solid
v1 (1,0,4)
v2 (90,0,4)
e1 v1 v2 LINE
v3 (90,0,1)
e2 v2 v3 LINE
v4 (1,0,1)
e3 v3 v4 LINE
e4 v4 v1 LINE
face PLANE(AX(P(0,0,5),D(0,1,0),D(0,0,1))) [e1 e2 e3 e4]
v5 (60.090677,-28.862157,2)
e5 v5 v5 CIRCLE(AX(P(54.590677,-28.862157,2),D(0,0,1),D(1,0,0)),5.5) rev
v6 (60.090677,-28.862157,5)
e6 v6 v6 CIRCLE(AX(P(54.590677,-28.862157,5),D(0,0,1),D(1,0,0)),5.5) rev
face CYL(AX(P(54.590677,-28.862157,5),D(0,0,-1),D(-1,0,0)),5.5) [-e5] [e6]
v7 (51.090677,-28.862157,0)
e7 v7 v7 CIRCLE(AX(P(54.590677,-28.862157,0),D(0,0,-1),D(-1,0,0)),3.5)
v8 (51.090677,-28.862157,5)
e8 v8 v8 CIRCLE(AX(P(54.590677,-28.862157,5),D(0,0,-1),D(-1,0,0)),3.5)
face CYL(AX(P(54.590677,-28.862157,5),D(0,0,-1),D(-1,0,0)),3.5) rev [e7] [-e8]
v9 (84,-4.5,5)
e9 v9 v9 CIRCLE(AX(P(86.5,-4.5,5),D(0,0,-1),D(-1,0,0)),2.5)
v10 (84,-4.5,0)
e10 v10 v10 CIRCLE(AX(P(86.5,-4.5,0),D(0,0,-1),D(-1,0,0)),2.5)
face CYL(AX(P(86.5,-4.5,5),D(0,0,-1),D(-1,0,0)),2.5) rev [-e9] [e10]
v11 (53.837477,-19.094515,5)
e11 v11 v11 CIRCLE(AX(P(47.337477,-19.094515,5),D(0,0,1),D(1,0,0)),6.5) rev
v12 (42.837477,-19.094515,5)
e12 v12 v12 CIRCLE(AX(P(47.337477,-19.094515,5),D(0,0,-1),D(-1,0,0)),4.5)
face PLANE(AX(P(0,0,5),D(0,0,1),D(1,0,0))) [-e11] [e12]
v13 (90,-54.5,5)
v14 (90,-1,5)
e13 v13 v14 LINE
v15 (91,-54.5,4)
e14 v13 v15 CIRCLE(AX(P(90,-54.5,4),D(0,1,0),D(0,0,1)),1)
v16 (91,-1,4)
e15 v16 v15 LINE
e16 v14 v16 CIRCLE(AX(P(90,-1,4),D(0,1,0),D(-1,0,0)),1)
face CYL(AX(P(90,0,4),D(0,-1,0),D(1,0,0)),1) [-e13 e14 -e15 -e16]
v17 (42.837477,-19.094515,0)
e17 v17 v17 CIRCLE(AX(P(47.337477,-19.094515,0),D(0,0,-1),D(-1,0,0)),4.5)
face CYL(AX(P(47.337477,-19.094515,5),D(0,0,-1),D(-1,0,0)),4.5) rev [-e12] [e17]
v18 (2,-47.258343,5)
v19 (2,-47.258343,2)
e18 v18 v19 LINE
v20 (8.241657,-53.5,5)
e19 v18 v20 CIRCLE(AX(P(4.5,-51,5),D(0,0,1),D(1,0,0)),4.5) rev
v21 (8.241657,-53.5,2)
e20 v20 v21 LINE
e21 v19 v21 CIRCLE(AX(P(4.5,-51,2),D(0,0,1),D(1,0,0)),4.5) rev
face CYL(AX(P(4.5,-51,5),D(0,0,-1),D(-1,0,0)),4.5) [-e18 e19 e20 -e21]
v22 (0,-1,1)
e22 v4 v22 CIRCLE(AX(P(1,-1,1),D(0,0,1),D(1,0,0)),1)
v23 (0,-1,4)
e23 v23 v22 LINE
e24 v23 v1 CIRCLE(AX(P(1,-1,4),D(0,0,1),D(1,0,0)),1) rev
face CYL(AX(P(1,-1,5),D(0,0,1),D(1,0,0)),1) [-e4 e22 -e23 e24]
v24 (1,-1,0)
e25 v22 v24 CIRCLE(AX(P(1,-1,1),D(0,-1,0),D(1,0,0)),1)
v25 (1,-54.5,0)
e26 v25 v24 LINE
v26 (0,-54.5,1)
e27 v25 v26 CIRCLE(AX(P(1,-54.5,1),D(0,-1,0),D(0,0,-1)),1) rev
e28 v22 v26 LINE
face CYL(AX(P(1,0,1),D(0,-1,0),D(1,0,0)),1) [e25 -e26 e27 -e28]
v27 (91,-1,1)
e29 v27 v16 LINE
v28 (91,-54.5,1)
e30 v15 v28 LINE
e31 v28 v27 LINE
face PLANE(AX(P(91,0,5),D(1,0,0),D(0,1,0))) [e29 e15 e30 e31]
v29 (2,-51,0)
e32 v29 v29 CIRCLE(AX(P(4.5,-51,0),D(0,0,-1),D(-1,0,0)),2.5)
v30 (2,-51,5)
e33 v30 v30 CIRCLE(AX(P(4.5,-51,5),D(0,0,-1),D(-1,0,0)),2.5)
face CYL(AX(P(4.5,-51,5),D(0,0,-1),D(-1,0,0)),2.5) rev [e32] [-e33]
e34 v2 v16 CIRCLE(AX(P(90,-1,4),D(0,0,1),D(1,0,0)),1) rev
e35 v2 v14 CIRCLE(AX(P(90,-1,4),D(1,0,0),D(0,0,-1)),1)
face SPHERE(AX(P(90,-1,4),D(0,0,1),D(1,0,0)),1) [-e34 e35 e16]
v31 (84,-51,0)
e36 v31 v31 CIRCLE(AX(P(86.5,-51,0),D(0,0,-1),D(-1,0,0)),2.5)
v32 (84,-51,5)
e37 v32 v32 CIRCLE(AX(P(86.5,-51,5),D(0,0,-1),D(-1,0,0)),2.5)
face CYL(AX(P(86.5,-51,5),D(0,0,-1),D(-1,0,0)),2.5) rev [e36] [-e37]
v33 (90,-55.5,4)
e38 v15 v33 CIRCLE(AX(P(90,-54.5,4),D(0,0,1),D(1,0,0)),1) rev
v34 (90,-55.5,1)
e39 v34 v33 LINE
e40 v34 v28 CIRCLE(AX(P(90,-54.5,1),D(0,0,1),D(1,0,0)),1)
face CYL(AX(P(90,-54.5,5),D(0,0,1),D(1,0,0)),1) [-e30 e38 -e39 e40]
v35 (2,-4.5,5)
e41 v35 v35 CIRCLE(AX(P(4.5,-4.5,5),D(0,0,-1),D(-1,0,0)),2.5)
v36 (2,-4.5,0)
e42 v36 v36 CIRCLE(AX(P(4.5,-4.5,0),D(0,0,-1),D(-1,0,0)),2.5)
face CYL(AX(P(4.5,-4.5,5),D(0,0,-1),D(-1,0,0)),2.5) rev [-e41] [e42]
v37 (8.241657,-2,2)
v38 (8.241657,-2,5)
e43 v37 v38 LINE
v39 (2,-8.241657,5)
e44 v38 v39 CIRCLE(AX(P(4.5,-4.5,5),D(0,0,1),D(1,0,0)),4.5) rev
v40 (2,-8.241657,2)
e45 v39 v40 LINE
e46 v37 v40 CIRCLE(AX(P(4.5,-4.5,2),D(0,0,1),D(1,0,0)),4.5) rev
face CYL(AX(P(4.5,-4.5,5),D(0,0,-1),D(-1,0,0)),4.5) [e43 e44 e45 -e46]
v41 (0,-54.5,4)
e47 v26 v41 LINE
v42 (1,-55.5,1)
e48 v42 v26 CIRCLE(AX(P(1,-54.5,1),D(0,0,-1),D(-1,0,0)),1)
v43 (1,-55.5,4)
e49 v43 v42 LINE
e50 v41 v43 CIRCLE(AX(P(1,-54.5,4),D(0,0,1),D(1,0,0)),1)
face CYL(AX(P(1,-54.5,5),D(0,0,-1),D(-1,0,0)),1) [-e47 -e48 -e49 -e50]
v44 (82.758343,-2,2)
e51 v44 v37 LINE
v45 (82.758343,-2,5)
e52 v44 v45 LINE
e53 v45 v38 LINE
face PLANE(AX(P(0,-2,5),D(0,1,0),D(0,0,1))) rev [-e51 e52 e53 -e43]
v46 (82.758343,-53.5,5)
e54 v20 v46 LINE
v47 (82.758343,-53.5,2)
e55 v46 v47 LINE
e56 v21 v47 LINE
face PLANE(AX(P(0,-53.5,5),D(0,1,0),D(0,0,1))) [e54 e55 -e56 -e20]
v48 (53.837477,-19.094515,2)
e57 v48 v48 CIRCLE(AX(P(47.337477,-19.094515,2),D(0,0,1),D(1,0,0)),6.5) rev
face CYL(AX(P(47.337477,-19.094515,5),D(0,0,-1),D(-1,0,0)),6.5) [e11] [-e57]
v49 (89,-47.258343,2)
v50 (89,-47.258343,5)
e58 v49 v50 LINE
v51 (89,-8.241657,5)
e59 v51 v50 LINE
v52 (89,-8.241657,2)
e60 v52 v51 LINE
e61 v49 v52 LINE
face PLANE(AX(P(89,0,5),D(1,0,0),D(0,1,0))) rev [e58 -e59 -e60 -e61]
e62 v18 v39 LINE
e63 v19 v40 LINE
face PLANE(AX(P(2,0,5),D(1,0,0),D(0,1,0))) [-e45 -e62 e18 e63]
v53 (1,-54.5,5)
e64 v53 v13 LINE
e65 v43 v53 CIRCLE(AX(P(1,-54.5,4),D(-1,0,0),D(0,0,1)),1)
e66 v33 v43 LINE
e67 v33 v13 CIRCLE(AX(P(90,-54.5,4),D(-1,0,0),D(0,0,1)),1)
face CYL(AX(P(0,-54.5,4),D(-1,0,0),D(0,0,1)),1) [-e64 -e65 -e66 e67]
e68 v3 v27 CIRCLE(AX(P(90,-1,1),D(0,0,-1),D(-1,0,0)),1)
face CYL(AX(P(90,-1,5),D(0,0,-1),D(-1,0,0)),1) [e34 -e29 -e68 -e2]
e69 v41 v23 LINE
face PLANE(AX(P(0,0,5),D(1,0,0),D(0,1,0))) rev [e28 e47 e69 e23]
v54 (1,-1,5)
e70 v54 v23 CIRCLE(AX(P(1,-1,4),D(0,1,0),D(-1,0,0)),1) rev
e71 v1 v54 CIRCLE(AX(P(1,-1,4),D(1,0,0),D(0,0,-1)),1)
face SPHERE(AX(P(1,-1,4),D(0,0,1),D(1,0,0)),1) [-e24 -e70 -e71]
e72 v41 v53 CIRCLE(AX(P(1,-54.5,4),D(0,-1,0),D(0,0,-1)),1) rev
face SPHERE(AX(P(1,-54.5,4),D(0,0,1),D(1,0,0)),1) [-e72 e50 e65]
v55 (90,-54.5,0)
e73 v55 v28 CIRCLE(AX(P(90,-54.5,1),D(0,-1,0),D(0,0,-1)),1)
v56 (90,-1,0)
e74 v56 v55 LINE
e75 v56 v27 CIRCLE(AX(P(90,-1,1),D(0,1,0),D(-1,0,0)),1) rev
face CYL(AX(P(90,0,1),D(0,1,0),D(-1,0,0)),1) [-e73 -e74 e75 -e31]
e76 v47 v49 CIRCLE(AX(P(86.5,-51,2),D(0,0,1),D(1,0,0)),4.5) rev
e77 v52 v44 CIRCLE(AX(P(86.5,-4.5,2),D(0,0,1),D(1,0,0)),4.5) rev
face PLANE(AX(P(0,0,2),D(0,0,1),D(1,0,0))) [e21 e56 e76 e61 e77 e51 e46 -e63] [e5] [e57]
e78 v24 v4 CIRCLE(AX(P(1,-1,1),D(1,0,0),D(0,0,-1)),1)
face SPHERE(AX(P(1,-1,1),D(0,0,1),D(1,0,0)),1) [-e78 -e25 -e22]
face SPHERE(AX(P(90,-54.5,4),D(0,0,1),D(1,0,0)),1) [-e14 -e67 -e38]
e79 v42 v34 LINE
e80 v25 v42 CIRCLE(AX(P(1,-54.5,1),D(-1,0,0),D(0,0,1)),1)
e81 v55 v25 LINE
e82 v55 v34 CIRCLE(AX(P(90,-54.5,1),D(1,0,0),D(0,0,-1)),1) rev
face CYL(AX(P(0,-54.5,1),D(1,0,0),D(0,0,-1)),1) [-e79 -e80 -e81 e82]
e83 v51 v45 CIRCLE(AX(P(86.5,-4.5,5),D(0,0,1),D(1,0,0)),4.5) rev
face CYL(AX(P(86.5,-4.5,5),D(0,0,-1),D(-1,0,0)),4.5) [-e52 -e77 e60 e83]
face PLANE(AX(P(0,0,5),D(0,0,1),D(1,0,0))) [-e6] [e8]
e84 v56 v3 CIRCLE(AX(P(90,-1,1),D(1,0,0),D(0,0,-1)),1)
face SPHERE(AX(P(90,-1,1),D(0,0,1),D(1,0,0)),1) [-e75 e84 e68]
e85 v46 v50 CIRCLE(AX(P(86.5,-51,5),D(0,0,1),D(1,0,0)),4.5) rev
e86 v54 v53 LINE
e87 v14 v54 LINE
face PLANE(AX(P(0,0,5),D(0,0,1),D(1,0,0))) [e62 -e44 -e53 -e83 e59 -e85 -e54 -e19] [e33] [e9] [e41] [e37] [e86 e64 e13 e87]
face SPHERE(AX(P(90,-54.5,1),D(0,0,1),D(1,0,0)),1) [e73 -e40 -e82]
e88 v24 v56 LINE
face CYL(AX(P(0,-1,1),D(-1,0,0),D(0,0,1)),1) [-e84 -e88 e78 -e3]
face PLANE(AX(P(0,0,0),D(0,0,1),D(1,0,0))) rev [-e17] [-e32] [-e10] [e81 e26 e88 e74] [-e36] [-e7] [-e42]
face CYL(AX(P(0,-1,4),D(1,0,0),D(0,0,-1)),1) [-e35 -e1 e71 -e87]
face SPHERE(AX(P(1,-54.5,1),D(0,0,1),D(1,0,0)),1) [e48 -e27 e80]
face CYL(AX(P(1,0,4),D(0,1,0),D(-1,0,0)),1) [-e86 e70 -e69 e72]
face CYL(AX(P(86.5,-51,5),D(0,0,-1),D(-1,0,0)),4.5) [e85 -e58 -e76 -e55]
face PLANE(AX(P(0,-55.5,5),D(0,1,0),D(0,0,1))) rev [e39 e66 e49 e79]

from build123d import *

# Parameters (mm, degrees)
SKETCH1_W           = 91
SKETCH1_H           = 55.5
BOSS_EXTRUDE1_DEPTH = 5
FILLET1_R           = 1
FILLET2_R           = 1
SKETCH3_R           = 2.5
SKETCH3_R_2         = 4.5
SKETCH3_R_3         = 3.5
CUT_EXTRUDE6_DEPTH  = 5
SHELL3_START        = 2
SHELL3_OUTLINE_R    = 5.5
SHELL3_OUTLINE_R_2  = 6.5
SHELL3_DEPTH        = 3


# Read off the part's stored shape, not the designer's step: Shell3
with BuildPart() as part:
    # Sketch1 → Boss-Extrude1 (new body)
    with BuildSketch(Plane.XY):
        with Locations((45.5, -27.75)):
            Rectangle(SKETCH1_W, SKETCH1_H)
    extrude(amount=BOSS_EXTRUDE1_DEPTH)

    # Fillet1
    fillet1_edges = [part.edges().sort_by_distance(p)[0] for p in [
        (0, -27.75, 5),
        (45.5, -55.5, 0),
        (0, -27.75, 0),
        (45.5, -55.5, 5),
        (0, 0, 2.5),
        (91, -55.5, 2.5),
        (0, -55.5, 2.5),
    ]]
    fillet(fillet1_edges, radius=FILLET1_R)

    # Fillet2
    # the kernel refuses this fillet: 1 mm, written as the material it takes off along each edge
    with BuildSketch(Plane(origin=(90, -54.5, 4), x_dir=(0, 0, 1), z_dir=(1, 0, 0))) as fillet2_piece_1_section:
        Polygon((0, 0), (FILLET2_R, 0), (FILLET2_R, FILLET2_R), (0, FILLET2_R), align=None)
    fillet2_piece_1 = extrude(amount=FILLET2_R, mode=Mode.PRIVATE)
    fillet2_piece_1 = fillet2_piece_1 - Plane(origin=(90, -54.5, 4), x_dir=(0, 0.7071067811865475, -0.7071067811865475), z_dir=(1, 0, 0)) * Sphere(FILLET2_R, mode=Mode.PRIVATE)
    add(fillet2_piece_1, mode=Mode.SUBTRACT)
    with BuildSketch(Plane(origin=(90, -54.5, 1), x_dir=(1, 0, 0), z_dir=(0, 0, -1))) as fillet2_piece_2_section:
        Polygon((0, 0), (FILLET2_R, 0), (FILLET2_R, FILLET2_R), (0, FILLET2_R), align=None)
    fillet2_piece_2 = extrude(amount=FILLET2_R, mode=Mode.PRIVATE)
    fillet2_piece_2 = fillet2_piece_2 - Plane(origin=(90, -54.5, 1), x_dir=(-0.7071067811865476, 0.7071067811865475, 0), z_dir=(0, 0, -1)) * Sphere(FILLET2_R, mode=Mode.PRIVATE)
    add(fillet2_piece_2, mode=Mode.SUBTRACT)
    with BuildSketch(Plane(origin=(1, -1, 4), x_dir=(0, 0, 1), z_dir=(0, 1, 0))) as fillet2_piece_3_section:
        Polygon((0, 0), (FILLET2_R, 0), (FILLET2_R, -FILLET2_R), (0, -FILLET2_R), align=None)
    fillet2_piece_3 = extrude(amount=FILLET2_R, mode=Mode.PRIVATE)
    fillet2_piece_3 = fillet2_piece_3 - Plane(origin=(1, -1, 4), x_dir=(0.7071067811865475, 0, -0.7071067811865475), z_dir=(0, 1, 0)) * Sphere(FILLET2_R, mode=Mode.PRIVATE)
    add(fillet2_piece_3, mode=Mode.SUBTRACT)
    with BuildSketch(Plane(origin=(1, -1, 1), x_dir=(0, 0, -1), z_dir=(0, 1, 0))) as fillet2_piece_4_section:
        Polygon((0, 0), (FILLET2_R, 0), (FILLET2_R, FILLET2_R), (0, FILLET2_R), align=None)
    fillet2_piece_4 = extrude(amount=FILLET2_R, mode=Mode.PRIVATE)
    fillet2_piece_4 = fillet2_piece_4 - Plane(origin=(1, -1, 1), x_dir=(0.7071067811865475, 0, 0.7071067811865475), z_dir=(0, 1, 0)) * Sphere(FILLET2_R, mode=Mode.PRIVATE)
    add(fillet2_piece_4, mode=Mode.SUBTRACT)
    with BuildSketch(Plane(origin=(90, -1, 4), x_dir=(1, 0, 0), z_dir=(0, 1, 0))) as fillet2_piece_5_section:
        Polygon((0, 0), (FILLET2_R, 0), (FILLET2_R, -FILLET2_R), (0, -FILLET2_R), align=None)
    fillet2_piece_5 = extrude(amount=FILLET2_R, mode=Mode.PRIVATE)
    fillet2_piece_5 = fillet2_piece_5 - Plane(origin=(90, -1, 4), x_dir=(-0.7071067811865475, 0, -0.7071067811865475), z_dir=(0, 1, 0)) * Sphere(FILLET2_R, mode=Mode.PRIVATE)
    add(fillet2_piece_5, mode=Mode.SUBTRACT)
    with BuildSketch(Plane(origin=(90, -1, 1), x_dir=(0, 0, -1), z_dir=(0, 1, 0))) as fillet2_piece_6_section:
        Polygon((0, 0), (FILLET2_R, 0), (FILLET2_R, -FILLET2_R), (0, -FILLET2_R), align=None)
    fillet2_piece_6 = extrude(amount=FILLET2_R, mode=Mode.PRIVATE)
    fillet2_piece_6 = fillet2_piece_6 - Plane(origin=(90, -1, 1), x_dir=(-0.7071067811865475, 0, 0.7071067811865475), z_dir=(0, 1, 0)) * Sphere(FILLET2_R, mode=Mode.PRIVATE)
    add(fillet2_piece_6, mode=Mode.SUBTRACT)
    with BuildSketch(Plane(origin=(91, -1, 5), x_dir=(0, 0, -1), z_dir=(0, -1, 0)), Plane(origin=(91, -1, 0), x_dir=(-1, 0, 0), z_dir=(0, -1, 0))) as fillet2_piece_7:
        with BuildLine():
            CenterArc((FILLET2_R, -FILLET2_R), FILLET2_R, 90, 90)
            Line((0, -FILLET2_R), (0, 0))
            Line((0, 0), (FILLET2_R, 0))
        make_face()
    extrude(amount=53.5, mode=Mode.SUBTRACT)
    with BuildSketch(Plane(origin=(1, 0, 0), x_dir=(0, 0, 1), z_dir=(1, 0, 0))) as fillet2_piece_8:
        with BuildLine():
            CenterArc((FILLET2_R, FILLET2_R), FILLET2_R, 180, 90)
            Line((0, FILLET2_R), (0, 0))
            Line((0, 0), (FILLET2_R, 0))
        make_face()
    extrude(amount=89, mode=Mode.SUBTRACT)
    with BuildSketch(Plane(origin=(1, 0, 5), x_dir=(0, 0, -1), z_dir=(1, 0, 0))) as fillet2_piece_9:
        with BuildLine():
            CenterArc((FILLET2_R, -FILLET2_R), FILLET2_R, 90, 90)
            Line((0, -FILLET2_R), (0, 0))
            Line((0, 0), (FILLET2_R, 0))
        make_face()
    extrude(amount=89, mode=Mode.SUBTRACT)
    with BuildSketch(Plane(origin=(91, 0, 1), x_dir=(-1, 0, 0), z_dir=(0, 0, 1))) as fillet2_piece_10:
        with BuildLine():
            CenterArc((FILLET2_R, FILLET2_R), FILLET2_R, 180, 90)
            Line((0, FILLET2_R), (0, 0))
            Line((0, 0), (FILLET2_R, 0))
        make_face()
    extrude(amount=3, mode=Mode.SUBTRACT)

    # Sketch3 → Cut-Extrude6 (cut)
    with BuildSketch(Plane(origin=(0, 0, 0), x_dir=(-1, 0, 0), z_dir=(0, 0, -1))):
        with Locations((-4.5, -51)):
            Circle(SKETCH3_R)
        with Locations((-47.337477188, -19.094515349)):
            Circle(SKETCH3_R_2)
        with Locations((-4.5, -4.5)):
            Circle(SKETCH3_R)
        with Locations((-54.590676617, -28.862157246)):
            Circle(SKETCH3_R_3)
        with Locations((-86.5, -4.5)):
            Circle(SKETCH3_R)
        with Locations((-86.5, -51)):
            Circle(SKETCH3_R)
    extrude(amount=-CUT_EXTRUDE6_DEPTH, mode=Mode.SUBTRACT)

    # Shell3 outline → Shell3 (cut)
    with BuildSketch(Plane.XY.offset(SHELL3_START)):
        with BuildLine():
            Line((2, -8.241657387), (2, -47.258342613))
            ThreePointArc((2, -47.258342613), (7.681980515, -47.818019485), (8.241657387, -53.5))
            Line((8.241657387, -53.5), (82.758342613, -53.5))
            ThreePointArc((82.758342613, -53.5), (83.318019485, -47.818019485), (89, -47.258342613))
            Line((89, -47.258342613), (89, -8.241657387))
            ThreePointArc((89, -8.241657387), (83.318019485, -7.681980515), (82.758342613, -2))
            Line((82.758342613, -2), (8.241657387, -2))
            ThreePointArc((8.241657387, -2), (7.681980515, -7.681980515), (2, -8.241657387))
        make_face()
        with Locations((54.590676617, -28.862157246)):
            Circle(SHELL3_OUTLINE_R, mode=Mode.SUBTRACT)
        with Locations((47.337477188, -19.094515349)):
            Circle(SHELL3_OUTLINE_R_2, mode=Mode.SUBTRACT)
    extrude(amount=SHELL3_DEPTH, mode=Mode.SUBTRACT)


solid = part.part
